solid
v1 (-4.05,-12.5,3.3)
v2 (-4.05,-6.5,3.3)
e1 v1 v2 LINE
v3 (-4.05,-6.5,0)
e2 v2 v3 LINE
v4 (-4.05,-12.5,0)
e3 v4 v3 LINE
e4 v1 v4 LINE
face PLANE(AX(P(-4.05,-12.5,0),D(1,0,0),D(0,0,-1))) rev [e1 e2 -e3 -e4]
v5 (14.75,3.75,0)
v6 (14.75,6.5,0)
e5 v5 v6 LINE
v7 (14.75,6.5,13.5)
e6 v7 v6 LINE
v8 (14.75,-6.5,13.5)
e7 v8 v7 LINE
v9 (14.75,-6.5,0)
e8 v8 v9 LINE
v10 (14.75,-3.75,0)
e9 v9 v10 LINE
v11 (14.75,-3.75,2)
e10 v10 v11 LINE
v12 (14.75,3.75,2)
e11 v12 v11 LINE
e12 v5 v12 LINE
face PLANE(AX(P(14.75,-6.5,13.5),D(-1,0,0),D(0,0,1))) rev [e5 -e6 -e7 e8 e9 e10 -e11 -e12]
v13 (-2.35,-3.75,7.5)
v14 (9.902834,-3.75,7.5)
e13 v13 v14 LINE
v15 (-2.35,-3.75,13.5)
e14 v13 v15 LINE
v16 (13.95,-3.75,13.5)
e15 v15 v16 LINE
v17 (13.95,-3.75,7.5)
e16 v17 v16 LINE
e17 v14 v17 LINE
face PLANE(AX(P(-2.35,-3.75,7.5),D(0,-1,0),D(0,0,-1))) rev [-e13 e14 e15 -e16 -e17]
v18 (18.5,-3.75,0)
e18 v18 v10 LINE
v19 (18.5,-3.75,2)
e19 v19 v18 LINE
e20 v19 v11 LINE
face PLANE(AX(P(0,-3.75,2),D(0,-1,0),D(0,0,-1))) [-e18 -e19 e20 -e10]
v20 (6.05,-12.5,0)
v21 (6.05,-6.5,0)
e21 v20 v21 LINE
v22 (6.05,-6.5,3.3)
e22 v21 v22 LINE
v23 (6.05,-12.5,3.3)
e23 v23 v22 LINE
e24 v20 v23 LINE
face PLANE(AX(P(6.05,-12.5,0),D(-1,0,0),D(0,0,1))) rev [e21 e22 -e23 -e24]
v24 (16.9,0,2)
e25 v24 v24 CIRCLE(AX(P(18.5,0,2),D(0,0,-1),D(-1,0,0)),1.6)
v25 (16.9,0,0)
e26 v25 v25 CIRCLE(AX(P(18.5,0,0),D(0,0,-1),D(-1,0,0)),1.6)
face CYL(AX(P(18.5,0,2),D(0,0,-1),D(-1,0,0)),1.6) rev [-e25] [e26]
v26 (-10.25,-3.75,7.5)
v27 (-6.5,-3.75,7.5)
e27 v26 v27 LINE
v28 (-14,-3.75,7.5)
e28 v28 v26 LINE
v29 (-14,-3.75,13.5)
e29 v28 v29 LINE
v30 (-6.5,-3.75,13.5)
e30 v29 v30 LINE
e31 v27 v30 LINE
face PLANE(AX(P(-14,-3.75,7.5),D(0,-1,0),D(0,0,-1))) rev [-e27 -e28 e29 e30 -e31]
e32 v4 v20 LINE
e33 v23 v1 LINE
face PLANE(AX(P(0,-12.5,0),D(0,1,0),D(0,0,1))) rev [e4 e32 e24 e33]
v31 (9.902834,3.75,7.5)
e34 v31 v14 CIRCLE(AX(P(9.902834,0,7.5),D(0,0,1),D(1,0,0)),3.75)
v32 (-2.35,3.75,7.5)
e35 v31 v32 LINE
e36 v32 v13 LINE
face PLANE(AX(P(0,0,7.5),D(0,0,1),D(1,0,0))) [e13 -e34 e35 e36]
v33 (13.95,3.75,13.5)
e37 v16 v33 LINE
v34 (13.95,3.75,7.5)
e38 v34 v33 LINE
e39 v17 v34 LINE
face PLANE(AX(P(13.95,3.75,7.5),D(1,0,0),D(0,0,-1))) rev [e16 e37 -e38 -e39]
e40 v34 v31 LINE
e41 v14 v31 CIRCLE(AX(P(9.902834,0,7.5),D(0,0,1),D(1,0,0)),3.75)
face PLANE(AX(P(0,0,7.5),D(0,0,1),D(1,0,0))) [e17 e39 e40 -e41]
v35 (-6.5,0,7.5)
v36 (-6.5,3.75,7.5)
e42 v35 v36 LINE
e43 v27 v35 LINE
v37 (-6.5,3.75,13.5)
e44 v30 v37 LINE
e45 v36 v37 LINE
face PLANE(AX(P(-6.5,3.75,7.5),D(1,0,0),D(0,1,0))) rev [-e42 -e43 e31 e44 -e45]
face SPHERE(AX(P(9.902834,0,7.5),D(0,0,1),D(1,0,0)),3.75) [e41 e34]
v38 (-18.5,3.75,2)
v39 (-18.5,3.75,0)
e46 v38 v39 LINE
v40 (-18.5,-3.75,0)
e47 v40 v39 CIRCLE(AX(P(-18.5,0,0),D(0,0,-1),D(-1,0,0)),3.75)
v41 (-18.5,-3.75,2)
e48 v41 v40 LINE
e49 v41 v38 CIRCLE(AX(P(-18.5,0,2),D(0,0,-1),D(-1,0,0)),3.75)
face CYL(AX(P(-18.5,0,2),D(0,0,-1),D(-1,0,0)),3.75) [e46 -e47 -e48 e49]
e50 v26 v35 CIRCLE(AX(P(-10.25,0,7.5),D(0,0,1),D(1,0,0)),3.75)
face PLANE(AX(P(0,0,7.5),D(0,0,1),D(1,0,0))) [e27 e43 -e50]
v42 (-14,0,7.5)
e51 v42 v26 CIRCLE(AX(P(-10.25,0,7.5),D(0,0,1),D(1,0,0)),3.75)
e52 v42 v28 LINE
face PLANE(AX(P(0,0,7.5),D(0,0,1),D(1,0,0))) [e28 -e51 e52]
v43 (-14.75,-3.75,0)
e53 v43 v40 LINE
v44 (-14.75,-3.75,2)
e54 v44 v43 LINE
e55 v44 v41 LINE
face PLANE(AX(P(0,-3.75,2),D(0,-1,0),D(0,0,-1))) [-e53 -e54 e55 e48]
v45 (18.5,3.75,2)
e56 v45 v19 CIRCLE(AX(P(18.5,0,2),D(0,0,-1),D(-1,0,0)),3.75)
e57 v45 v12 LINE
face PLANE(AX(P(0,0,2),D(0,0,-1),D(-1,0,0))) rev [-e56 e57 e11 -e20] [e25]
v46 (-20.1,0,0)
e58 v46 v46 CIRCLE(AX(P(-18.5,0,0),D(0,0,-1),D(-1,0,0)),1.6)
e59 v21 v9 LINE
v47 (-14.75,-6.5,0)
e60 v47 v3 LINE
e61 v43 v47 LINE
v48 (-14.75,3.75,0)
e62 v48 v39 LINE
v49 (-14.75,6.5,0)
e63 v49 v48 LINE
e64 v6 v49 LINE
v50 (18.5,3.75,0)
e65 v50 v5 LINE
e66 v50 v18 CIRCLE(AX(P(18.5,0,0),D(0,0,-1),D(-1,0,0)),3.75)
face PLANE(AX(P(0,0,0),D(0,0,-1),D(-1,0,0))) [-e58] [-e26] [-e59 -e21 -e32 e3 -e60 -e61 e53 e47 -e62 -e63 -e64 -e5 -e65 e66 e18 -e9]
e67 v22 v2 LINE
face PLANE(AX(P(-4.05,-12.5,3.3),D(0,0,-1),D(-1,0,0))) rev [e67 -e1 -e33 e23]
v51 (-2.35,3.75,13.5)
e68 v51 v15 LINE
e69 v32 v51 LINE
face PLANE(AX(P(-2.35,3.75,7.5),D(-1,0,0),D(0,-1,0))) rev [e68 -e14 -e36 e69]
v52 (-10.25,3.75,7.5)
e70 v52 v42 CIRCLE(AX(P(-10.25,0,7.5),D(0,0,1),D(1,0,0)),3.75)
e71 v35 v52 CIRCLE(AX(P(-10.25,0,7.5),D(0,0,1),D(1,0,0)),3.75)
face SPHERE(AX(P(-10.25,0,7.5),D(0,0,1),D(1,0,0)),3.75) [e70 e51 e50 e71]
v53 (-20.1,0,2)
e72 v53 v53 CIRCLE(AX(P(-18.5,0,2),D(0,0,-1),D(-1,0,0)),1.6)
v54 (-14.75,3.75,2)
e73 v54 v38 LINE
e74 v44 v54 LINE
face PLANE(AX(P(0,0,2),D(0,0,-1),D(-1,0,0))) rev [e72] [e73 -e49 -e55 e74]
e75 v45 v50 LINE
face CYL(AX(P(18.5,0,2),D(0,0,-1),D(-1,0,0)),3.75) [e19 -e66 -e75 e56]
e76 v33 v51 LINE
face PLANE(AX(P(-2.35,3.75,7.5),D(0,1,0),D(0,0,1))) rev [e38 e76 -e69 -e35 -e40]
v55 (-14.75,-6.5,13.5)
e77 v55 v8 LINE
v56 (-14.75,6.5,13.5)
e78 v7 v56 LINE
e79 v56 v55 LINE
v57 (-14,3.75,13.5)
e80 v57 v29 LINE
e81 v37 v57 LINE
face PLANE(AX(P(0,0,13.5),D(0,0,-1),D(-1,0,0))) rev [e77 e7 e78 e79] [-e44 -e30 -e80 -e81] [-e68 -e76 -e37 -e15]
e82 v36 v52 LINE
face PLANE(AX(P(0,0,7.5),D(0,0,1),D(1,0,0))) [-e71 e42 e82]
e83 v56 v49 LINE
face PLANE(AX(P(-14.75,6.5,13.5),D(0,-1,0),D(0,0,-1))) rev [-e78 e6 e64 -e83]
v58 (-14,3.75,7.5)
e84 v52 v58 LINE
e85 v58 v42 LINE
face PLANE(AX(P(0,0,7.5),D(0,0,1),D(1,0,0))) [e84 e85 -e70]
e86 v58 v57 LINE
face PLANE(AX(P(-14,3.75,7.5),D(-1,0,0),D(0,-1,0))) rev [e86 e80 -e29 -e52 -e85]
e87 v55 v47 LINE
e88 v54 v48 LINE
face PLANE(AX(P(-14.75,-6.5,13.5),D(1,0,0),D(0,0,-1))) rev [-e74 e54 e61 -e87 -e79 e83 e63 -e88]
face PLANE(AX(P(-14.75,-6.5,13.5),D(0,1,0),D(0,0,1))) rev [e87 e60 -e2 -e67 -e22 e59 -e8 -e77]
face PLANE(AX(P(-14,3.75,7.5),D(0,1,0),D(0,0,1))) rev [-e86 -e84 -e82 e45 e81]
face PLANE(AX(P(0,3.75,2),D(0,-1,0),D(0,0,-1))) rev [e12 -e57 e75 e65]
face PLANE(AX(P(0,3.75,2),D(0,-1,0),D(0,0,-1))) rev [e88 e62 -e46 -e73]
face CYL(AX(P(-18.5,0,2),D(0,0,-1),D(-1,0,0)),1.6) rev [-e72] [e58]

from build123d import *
from build123d.topology import SkipClean

# Parameters (mm, degrees)
SKETCH_1_W          = 29.5
SKETCH_1_H          = 13
EXTRUDE_1_DEPTH     = 13.5
SKETCH_2_R          = 1.6
EXTRUDE_2_DEPTH     = 2
SKETCH_3_W          = 7.5
SKETCH_3_H          = 7.5
SKETCH_3_W_2        = 16.3
CUT_EXTRUDE_1_DEPTH = 6
SKETCH_7_W          = 10.1
SKETCH_7_H          = 3.3
EXTRUDE_3_DEPTH     = 6


with BuildPart() as part:
    # 스케치1 → 보스-돌출1 (new body)
    with BuildSketch(Plane.XY):
        Rectangle(SKETCH_1_W, SKETCH_1_H)
    extrude(amount=EXTRUDE_1_DEPTH)

    # 스케치2 → 보스-돌출2 (add)
    with BuildSketch(Plane(origin=(0, 0, 0), x_dir=(-1, 0, 0), z_dir=(0, 0, -1))):
        with BuildLine():
            Line((-18.5, -3.75), (18.5, -3.75))
            ThreePointArc((18.5, -3.75), (22.25, 0), (18.5, 3.75))
            Line((18.5, 3.75), (-18.5, 3.75))
            ThreePointArc((-18.5, 3.75), (-22.25, 0), (-18.5, -3.75))
        make_face()
        with Locations((-18.5, 0)):
            Circle(SKETCH_2_R, mode=Mode.SUBTRACT)
        with Locations((18.5, 0)):
            Circle(SKETCH_2_R, mode=Mode.SUBTRACT)
    extrude(amount=-EXTRUDE_2_DEPTH)

    # 스케치3 → 컷-돌출1 (cut)
    with BuildSketch(Plane.XY.offset(13.5)):
        with Locations((-10.25, 0)):
            Rectangle(SKETCH_3_W, SKETCH_3_H)
        with Locations((5.8, 0)):
            Rectangle(SKETCH_3_W_2, SKETCH_3_H)
    extrude(amount=-CUT_EXTRUDE_1_DEPTH, mode=Mode.SUBTRACT)

    # 스케치4 → 회전1 (revolve)
    with BuildSketch(Plane.XY.offset(7.5)):
        with BuildLine():
            Line((-10.25, -3.75), (-10.25, 3.75))
            ThreePointArc((-10.25, 3.75), (-14, 0), (-10.25, -3.75))
        make_face()
    revolve(axis=Axis((-10.25, 3.75, 7.5), (0, -1, 0)))

    # 스케치6 → 회전14 (revolve)
    with SkipClean():  # the faces are left unmerged after this step: merging them gives an invalid solid
        with BuildSketch(Plane.XY.offset(7.5)):
            with BuildLine():
                Line((9.902834279, 3.75), (9.902834279, -3.75))
                ThreePointArc((9.902834279, -3.75), (12.554484709, -2.651650429), (13.652834279, 0))
                ThreePointArc((13.652834279, 0), (12.554484709, 2.651650429), (9.902834279, 3.75))
            make_face()
        revolve(axis=Axis((9.902834279, -3.75, 7.5), (0, 1, 0)))

    # 스케치7 → 보스-돌출3 (add)
    with SkipClean():  # the faces are left unmerged after this step: merging them gives an invalid solid
        with BuildSketch(Plane.XZ.offset(6.5)):
            with Locations((1, 1.65)):
                Rectangle(SKETCH_7_W, SKETCH_7_H)
        extrude(amount=EXTRUDE_3_DEPTH)


solid = part.part
